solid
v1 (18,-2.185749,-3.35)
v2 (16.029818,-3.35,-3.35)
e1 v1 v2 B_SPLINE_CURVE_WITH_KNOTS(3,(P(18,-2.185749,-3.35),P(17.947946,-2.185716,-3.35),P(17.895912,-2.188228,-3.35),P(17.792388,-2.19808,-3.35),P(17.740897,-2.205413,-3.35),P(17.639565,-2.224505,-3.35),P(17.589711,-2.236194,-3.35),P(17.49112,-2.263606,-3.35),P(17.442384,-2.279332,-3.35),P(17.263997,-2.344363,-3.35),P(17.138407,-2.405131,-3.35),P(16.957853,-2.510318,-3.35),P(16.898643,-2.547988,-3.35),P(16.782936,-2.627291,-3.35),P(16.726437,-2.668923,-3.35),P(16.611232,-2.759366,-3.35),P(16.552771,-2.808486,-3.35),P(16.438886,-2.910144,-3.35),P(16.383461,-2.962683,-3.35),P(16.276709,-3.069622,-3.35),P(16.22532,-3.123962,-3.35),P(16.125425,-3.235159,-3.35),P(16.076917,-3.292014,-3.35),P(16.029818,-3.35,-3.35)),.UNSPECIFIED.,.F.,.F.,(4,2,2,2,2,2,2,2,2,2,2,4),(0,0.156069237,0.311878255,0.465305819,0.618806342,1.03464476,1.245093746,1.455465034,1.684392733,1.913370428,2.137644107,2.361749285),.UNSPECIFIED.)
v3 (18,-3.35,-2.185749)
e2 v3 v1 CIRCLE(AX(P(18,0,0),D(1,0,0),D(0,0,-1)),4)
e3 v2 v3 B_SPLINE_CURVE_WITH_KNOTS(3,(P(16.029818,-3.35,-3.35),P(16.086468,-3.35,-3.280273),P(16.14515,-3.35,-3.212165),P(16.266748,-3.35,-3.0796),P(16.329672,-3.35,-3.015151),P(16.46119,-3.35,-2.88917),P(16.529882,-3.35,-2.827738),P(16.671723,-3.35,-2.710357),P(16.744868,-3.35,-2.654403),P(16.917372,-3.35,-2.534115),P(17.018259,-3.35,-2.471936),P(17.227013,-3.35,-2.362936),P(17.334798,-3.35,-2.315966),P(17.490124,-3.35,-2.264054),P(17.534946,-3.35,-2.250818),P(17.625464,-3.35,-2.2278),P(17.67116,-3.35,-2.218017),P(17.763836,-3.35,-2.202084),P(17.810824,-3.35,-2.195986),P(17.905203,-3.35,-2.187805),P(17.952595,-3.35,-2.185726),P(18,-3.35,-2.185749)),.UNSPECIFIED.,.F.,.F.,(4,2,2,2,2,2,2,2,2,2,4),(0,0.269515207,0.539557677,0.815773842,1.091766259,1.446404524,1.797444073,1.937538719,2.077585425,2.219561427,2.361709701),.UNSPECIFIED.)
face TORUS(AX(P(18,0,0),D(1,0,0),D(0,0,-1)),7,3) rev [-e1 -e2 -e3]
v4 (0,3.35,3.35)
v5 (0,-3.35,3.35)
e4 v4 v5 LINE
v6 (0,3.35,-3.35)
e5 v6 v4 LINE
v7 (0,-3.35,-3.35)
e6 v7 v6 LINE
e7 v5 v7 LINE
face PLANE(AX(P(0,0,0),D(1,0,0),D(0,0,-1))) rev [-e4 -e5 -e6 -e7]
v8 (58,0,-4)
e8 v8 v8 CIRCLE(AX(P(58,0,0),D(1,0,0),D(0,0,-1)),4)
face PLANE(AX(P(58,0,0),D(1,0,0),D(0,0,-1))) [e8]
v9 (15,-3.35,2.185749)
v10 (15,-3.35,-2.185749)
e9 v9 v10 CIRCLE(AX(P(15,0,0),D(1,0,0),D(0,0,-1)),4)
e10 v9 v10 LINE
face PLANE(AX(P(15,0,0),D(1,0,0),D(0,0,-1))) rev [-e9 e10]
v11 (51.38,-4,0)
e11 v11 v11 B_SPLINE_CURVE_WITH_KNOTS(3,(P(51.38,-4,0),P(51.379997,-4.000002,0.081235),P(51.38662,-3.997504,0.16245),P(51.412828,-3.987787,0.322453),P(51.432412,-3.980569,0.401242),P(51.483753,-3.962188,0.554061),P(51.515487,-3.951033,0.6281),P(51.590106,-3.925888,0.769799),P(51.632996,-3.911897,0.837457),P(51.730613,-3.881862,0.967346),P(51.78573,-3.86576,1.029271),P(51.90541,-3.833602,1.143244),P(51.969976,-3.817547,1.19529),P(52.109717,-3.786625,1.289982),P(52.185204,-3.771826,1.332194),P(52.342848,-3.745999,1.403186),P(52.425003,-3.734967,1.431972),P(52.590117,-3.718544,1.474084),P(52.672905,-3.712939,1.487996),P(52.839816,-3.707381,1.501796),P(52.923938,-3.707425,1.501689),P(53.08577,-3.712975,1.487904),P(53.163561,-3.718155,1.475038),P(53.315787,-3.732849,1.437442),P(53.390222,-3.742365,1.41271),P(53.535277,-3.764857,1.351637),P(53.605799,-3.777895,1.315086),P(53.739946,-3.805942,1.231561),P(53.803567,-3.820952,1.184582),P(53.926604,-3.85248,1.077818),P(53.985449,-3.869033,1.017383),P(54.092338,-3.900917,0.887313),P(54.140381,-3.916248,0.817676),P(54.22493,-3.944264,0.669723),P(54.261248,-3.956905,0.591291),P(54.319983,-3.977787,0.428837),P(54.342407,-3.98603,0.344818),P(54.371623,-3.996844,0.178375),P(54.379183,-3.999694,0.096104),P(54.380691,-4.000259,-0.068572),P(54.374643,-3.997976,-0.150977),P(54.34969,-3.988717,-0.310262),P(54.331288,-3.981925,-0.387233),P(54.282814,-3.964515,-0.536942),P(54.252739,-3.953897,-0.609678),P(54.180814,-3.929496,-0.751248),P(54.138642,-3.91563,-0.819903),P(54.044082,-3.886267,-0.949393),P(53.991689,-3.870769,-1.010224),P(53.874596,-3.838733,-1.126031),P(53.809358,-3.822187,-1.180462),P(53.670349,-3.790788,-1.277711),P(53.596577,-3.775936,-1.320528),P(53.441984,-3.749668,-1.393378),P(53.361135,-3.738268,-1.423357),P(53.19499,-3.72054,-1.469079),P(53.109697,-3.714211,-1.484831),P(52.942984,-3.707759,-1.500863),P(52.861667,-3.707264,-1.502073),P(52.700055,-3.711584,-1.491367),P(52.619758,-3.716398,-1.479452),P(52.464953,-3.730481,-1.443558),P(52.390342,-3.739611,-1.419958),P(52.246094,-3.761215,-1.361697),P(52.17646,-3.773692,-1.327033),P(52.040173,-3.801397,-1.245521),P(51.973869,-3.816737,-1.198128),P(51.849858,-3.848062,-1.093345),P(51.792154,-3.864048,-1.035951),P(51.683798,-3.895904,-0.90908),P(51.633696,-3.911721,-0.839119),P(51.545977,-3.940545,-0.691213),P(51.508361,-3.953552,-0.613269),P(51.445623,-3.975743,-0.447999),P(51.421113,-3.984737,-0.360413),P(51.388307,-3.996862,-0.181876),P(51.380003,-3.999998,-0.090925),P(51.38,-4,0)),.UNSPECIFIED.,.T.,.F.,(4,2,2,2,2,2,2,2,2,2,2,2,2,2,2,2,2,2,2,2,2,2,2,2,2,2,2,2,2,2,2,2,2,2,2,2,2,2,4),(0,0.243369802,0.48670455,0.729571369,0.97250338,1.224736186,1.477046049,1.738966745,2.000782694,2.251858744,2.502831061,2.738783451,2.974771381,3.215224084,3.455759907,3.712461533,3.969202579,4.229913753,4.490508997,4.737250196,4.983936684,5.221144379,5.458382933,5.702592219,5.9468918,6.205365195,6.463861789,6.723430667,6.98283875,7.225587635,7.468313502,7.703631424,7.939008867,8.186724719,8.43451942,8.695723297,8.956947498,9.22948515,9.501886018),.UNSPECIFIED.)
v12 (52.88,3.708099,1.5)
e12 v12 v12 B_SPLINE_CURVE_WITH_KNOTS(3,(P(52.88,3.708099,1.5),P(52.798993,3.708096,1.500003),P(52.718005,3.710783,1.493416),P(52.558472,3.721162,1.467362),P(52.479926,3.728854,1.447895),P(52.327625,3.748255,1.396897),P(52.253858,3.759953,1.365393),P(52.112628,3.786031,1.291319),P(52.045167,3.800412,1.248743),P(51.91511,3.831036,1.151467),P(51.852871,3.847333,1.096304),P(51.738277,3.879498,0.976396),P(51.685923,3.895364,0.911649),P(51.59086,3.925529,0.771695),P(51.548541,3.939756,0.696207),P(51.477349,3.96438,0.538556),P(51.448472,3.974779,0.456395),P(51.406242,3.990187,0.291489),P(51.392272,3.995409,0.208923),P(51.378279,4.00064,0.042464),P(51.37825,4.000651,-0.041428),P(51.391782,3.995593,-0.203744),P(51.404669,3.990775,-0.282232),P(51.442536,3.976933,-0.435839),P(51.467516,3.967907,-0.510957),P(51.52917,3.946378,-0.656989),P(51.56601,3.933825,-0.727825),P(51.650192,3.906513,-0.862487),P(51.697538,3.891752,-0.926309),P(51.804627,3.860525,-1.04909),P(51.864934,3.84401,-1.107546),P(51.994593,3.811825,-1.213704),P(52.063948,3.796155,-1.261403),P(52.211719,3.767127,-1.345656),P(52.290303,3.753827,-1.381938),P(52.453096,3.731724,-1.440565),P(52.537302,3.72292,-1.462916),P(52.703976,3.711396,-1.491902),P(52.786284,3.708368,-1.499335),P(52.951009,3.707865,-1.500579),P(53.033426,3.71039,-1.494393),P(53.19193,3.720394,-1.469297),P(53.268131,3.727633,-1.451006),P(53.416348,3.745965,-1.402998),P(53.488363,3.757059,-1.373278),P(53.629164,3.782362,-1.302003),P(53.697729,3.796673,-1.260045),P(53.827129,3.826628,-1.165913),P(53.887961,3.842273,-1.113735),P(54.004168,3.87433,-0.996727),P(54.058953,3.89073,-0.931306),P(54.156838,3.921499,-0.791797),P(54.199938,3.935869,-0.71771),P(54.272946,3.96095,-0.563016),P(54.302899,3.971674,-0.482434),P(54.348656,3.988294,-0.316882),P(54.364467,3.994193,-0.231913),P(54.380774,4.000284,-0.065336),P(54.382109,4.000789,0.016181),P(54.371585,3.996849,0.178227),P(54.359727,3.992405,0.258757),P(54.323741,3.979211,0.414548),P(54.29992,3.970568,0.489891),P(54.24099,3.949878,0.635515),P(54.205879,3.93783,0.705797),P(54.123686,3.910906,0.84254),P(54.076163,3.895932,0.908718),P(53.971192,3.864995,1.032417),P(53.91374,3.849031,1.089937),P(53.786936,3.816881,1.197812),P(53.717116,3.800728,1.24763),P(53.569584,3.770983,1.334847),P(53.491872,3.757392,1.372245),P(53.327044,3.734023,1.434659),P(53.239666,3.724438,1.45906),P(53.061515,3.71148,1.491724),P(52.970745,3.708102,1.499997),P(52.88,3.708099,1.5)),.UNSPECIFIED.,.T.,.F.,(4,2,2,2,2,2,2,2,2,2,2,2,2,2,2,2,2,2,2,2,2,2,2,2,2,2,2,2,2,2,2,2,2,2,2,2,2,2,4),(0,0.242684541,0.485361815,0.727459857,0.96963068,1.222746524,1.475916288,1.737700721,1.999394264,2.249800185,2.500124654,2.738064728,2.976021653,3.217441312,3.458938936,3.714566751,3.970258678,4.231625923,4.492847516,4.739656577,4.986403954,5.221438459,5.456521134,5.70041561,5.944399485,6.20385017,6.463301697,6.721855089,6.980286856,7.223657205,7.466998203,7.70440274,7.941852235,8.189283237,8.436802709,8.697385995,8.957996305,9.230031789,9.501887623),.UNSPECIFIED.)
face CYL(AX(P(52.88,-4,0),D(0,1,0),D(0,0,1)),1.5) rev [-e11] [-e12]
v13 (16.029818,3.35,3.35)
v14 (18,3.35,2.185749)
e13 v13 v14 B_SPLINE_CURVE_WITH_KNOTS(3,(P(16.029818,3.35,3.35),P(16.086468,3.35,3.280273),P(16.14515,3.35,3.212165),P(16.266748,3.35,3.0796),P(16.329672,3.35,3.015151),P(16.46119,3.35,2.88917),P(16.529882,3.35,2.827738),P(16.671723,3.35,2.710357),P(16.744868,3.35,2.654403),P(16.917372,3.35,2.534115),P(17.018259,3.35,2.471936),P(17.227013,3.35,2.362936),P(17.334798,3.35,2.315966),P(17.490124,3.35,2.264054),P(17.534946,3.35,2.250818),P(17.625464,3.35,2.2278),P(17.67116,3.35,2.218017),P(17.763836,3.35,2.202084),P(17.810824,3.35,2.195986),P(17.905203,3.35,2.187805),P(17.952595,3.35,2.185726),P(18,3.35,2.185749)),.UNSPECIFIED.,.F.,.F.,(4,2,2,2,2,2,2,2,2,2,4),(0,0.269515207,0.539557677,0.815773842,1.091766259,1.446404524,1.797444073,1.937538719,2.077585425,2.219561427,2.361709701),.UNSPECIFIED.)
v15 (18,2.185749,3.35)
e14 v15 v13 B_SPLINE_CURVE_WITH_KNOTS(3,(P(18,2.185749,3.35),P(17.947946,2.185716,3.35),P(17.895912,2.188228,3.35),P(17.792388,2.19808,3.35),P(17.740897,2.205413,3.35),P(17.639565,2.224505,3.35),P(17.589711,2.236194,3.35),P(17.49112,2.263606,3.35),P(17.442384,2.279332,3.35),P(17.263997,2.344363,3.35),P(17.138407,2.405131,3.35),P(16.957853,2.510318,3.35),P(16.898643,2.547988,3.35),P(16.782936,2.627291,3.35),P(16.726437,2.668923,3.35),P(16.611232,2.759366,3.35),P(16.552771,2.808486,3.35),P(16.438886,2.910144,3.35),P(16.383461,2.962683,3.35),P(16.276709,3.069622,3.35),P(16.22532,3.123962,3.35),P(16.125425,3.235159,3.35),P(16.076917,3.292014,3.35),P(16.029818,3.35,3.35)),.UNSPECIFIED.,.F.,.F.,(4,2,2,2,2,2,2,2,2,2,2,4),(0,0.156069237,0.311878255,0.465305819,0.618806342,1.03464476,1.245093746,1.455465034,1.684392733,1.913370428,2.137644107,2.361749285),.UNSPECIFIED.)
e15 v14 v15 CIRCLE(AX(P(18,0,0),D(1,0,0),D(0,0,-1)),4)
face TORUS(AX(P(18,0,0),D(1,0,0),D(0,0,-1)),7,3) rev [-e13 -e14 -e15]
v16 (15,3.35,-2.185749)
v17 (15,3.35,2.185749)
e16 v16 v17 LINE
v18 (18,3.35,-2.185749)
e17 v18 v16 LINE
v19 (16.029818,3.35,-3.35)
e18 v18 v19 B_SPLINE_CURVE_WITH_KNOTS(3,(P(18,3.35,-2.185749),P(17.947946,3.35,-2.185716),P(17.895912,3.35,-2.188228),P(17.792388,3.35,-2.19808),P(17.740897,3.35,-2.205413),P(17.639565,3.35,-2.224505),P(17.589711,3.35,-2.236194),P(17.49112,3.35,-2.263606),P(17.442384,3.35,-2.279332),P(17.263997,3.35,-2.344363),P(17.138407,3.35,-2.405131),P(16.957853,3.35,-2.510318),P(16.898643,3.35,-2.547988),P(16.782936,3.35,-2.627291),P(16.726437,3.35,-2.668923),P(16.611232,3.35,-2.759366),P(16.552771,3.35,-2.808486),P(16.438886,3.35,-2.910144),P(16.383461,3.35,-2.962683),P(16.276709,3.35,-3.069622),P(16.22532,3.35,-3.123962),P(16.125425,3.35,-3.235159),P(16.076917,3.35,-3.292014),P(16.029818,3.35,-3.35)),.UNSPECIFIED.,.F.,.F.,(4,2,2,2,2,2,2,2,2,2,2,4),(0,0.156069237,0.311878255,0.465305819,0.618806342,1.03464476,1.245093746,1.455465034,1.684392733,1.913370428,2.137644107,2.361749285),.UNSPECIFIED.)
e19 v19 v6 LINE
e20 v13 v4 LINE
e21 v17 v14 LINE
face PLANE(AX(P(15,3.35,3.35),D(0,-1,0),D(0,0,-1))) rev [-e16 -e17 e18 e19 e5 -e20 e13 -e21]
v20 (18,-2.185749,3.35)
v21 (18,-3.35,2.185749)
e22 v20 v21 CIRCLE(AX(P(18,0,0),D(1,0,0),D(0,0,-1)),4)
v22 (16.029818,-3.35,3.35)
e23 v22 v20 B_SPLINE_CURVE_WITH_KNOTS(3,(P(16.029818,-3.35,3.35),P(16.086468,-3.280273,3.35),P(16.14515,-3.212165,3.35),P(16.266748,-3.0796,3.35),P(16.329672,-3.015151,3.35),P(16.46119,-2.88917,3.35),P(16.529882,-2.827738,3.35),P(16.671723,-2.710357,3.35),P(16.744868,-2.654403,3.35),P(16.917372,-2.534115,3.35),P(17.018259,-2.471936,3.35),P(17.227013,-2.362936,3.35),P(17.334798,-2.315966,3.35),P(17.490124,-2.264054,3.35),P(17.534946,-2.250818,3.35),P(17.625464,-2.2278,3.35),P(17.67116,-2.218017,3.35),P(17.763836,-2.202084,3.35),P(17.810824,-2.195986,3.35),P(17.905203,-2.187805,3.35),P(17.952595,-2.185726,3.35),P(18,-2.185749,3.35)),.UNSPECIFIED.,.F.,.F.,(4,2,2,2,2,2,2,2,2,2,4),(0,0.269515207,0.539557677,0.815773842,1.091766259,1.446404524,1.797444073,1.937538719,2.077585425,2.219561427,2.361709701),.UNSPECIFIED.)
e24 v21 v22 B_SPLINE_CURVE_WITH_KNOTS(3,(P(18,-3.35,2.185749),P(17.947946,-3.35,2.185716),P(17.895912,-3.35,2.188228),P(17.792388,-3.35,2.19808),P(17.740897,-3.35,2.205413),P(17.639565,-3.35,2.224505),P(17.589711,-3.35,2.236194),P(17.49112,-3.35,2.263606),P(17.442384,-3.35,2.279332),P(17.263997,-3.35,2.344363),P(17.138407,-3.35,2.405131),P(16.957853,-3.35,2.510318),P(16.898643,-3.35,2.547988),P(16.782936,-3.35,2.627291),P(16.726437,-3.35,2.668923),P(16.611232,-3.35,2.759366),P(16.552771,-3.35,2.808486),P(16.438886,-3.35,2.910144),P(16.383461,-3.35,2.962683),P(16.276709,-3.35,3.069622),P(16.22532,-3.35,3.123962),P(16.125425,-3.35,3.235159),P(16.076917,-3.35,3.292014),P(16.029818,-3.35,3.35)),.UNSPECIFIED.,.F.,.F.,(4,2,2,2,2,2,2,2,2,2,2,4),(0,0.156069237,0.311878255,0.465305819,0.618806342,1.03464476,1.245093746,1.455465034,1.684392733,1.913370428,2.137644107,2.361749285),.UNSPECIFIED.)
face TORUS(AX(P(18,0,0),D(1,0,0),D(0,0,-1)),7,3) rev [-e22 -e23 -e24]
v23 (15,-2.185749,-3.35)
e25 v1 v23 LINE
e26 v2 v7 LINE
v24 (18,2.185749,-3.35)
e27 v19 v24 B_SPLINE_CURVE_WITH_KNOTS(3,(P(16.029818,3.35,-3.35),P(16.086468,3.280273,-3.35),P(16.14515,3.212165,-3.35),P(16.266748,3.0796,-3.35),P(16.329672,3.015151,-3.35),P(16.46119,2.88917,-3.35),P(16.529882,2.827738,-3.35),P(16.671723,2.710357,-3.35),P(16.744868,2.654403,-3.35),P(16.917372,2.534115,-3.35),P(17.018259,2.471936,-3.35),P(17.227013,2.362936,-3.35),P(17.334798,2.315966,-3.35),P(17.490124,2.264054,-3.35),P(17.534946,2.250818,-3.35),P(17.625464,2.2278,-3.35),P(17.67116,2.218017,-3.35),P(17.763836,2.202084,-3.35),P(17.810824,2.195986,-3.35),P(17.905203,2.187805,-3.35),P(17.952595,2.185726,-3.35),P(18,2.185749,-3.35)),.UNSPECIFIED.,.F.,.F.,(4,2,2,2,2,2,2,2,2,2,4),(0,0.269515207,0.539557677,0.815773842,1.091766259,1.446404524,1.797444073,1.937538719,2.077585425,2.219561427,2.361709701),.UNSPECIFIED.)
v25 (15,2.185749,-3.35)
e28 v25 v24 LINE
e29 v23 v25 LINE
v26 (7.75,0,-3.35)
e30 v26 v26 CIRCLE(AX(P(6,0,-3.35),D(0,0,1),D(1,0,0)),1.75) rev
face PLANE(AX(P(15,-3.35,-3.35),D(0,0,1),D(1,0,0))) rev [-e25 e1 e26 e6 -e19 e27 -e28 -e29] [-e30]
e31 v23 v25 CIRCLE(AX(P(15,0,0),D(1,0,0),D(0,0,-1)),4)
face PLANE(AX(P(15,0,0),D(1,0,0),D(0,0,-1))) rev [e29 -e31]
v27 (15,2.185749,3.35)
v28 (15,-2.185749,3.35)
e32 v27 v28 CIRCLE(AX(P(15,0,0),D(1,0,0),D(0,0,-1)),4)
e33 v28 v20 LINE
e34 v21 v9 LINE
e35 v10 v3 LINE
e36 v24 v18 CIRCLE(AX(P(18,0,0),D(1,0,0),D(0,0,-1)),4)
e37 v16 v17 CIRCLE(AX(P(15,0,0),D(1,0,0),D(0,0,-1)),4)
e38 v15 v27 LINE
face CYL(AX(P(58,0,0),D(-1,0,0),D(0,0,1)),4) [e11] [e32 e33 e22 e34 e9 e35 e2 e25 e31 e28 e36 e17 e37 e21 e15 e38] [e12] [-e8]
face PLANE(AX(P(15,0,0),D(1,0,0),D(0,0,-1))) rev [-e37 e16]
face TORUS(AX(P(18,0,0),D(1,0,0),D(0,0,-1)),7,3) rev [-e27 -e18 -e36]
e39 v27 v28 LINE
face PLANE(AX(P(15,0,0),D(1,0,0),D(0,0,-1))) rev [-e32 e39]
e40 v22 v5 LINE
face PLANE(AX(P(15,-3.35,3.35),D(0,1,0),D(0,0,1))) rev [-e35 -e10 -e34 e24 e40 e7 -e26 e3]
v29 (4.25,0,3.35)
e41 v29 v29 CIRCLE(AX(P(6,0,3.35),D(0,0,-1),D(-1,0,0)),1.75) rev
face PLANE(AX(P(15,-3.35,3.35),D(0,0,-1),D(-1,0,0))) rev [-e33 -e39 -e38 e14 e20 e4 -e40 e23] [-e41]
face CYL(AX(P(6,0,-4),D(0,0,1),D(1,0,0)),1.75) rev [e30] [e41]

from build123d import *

# Parameters (mm, degrees)
ESQUISSE1_W                  = 6.7
ESQUISSE1_H                  = 6.7
BOSS_EXTRU_1_DEPTH           = 15
ESQUISSE2_R                  = 4
BOSS_EXTRU_2_DEPTH           = 43
ENL_V_MAT_EXTRU_1_DEPTH      = 59.275209137
ENL_V_MAT_EXTRU_1_DEPTH_BACK = 59.275209137
ESQUISSE3_R                  = 1.5
CONG_1_R                     = 3
ENL_V_MAT_EXTRU_2_DEPTH      = 59.600533392
ENL_V_MAT_EXTRU_2_DEPTH_BACK = 59.600533392
ESQUISSE4_R                  = 1.75


with BuildPart() as part:
    # Esquisse1 → Boss.-Extru.1 (new body)
    with BuildSketch(Plane.YZ):
        Rectangle(ESQUISSE1_W, ESQUISSE1_H)
    extrude(amount=BOSS_EXTRU_1_DEPTH)

    # Esquisse2 → Boss.-Extru.2 (add)
    with BuildSketch(Plane.YZ.offset(15)):
        with Locations(Location((0, 0, 0), (0, 0, 56.877059792))):
            Circle(ESQUISSE2_R)
    extrude(amount=BOSS_EXTRU_2_DEPTH)

    # Esquisse3 → Enlèv. mat.-Extru.1 (cut, two sides: drawn at the far end of the back side and taken through both)
    with BuildSketch(Plane(origin=(0, 0, 0), x_dir=(-1, 0, 0), z_dir=(0, 1, 0)).offset(-ENL_V_MAT_EXTRU_1_DEPTH_BACK)):
        with Locations(Location((-52.88, 0, 0), (0, 0, 90))):
            Circle(ESQUISSE3_R)
    extrude(amount=ENL_V_MAT_EXTRU_1_DEPTH + ENL_V_MAT_EXTRU_1_DEPTH_BACK, mode=Mode.SUBTRACT)

    # Congé1
    # the kernel refuses this fillet: 3 mm, written as the material it adds along each edge
    with BuildSketch(Plane(origin=(15, 0, 0), x_dir=(0, -0.9627373172303846, -0.27043827024302985), z_dir=(0, -0.27043827024302985, 0.9627373172303846))) as cong_1_piece_1_section:
        with BuildLine():
            CenterArc((4 + CONG_1_R, CONG_1_R), CONG_1_R, 180, 90)
            Line((4 + CONG_1_R, 0), (4, 0))
            Line((4, 0), (4, CONG_1_R))
        make_face()
    cong_1_piece_1 = revolve(axis=Axis((15, 0, 0), (1, 0, 0)), revolution_arc=238.619303718, mode=Mode.PRIVATE)
    cong_1_piece_1 = split(cong_1_piece_1, bisect_by=Plane(origin=(16.010494669, -2.96099487, 3.35), z_dir=(0, 0, -1)), keep=Keep.TOP, mode=Mode.PRIVATE)
    cong_1_piece_1 = split(cong_1_piece_1, bisect_by=Plane(origin=(16.010494669, -2.96099487, -3.35), z_dir=(0, 0, 1)), keep=Keep.TOP, mode=Mode.PRIVATE)
    cong_1_piece_1 = split(cong_1_piece_1, bisect_by=Plane(origin=(16.010494669, 3.35, -2.96099477), z_dir=(0, -1, 0)), keep=Keep.TOP, mode=Mode.PRIVATE)
    cong_1_piece_1 = split(cong_1_piece_1, bisect_by=Plane(origin=(16.010494669, -3.35, -2.96099477), z_dir=(0, 1, 0)), keep=Keep.TOP, mode=Mode.PRIVATE)
    add(cong_1_piece_1)
    with BuildSketch(Plane(origin=(15, 0, 0), x_dir=(0, 0.27043827024295675, -0.962737317230405), z_dir=(0, -0.962737317230405, -0.27043827024295675))) as cong_1_piece_2_section:
        with BuildLine():
            CenterArc((4 + CONG_1_R, CONG_1_R), CONG_1_R, 180, 90)
            Line((4 + CONG_1_R, 0), (4, 0))
            Line((4, 0), (4, CONG_1_R))
        make_face()
    cong_1_piece_2 = revolve(axis=Axis((15, 0, 0), (1, 0, 0)), revolution_arc=238.619303718, mode=Mode.PRIVATE)
    cong_1_piece_2 = split(cong_1_piece_2, bisect_by=Plane(origin=(16.010494669, 2.96099477, 3.35), z_dir=(0, 0, -1)), keep=Keep.TOP, mode=Mode.PRIVATE)
    cong_1_piece_2 = split(cong_1_piece_2, bisect_by=Plane(origin=(16.010494669, 2.96099477, -3.35), z_dir=(0, 0, 1)), keep=Keep.TOP, mode=Mode.PRIVATE)
    cong_1_piece_2 = split(cong_1_piece_2, bisect_by=Plane(origin=(16.010494669, 3.35, -2.96099487), z_dir=(0, -1, 0)), keep=Keep.TOP, mode=Mode.PRIVATE)
    cong_1_piece_2 = split(cong_1_piece_2, bisect_by=Plane(origin=(16.010494669, -3.35, -2.96099487), z_dir=(0, 1, 0)), keep=Keep.TOP, mode=Mode.PRIVATE)
    add(cong_1_piece_2)
    with BuildSketch(Plane(origin=(15, 0, 0), x_dir=(0, 0.9627373172304061, 0.27043827024295286), z_dir=(0, 0.27043827024295286, -0.9627373172304061))) as cong_1_piece_3_section:
        with BuildLine():
            CenterArc((4 + CONG_1_R, CONG_1_R), CONG_1_R, 180, 90)
            Line((4 + CONG_1_R, 0), (4, 0))
            Line((4, 0), (4, CONG_1_R))
        make_face()
    cong_1_piece_3 = revolve(axis=Axis((15, 0, 0), (1, 0, 0)), revolution_arc=238.619303718, mode=Mode.PRIVATE)
    cong_1_piece_3 = split(cong_1_piece_3, bisect_by=Plane(origin=(16.010494669, 2.96099487, 3.35), z_dir=(0, 0, -1)), keep=Keep.TOP, mode=Mode.PRIVATE)
    cong_1_piece_3 = split(cong_1_piece_3, bisect_by=Plane(origin=(16.010494669, 2.96099487, -3.35), z_dir=(0, 0, 1)), keep=Keep.TOP, mode=Mode.PRIVATE)
    cong_1_piece_3 = split(cong_1_piece_3, bisect_by=Plane(origin=(16.010494669, 3.35, 2.96099477), z_dir=(0, -1, 0)), keep=Keep.TOP, mode=Mode.PRIVATE)
    cong_1_piece_3 = split(cong_1_piece_3, bisect_by=Plane(origin=(16.010494669, -3.35, 2.96099477), z_dir=(0, 1, 0)), keep=Keep.TOP, mode=Mode.PRIVATE)
    add(cong_1_piece_3)
    with BuildSketch(Plane(origin=(15, 0, 0), x_dir=(0, -0.2704382702430083, 0.9627373172303906), z_dir=(0, 0.9627373172303906, 0.2704382702430083))) as cong_1_piece_4_section:
        with BuildLine():
            CenterArc((4 + CONG_1_R, CONG_1_R), CONG_1_R, 180, 90)
            Line((4 + CONG_1_R, 0), (4, 0))
            Line((4, 0), (4, CONG_1_R))
        make_face()
    cong_1_piece_4 = revolve(axis=Axis((15, 0, 0), (1, 0, 0)), revolution_arc=238.619303718, mode=Mode.PRIVATE)
    cong_1_piece_4 = split(cong_1_piece_4, bisect_by=Plane(origin=(16.010494669, -2.96099477, 3.35), z_dir=(0, 0, -1)), keep=Keep.TOP, mode=Mode.PRIVATE)
    cong_1_piece_4 = split(cong_1_piece_4, bisect_by=Plane(origin=(16.010494669, -2.96099477, -3.35), z_dir=(0, 0, 1)), keep=Keep.TOP, mode=Mode.PRIVATE)
    cong_1_piece_4 = split(cong_1_piece_4, bisect_by=Plane(origin=(16.010494669, 3.35, 2.96099487), z_dir=(0, -1, 0)), keep=Keep.TOP, mode=Mode.PRIVATE)
    cong_1_piece_4 = split(cong_1_piece_4, bisect_by=Plane(origin=(16.010494669, -3.35, 2.96099487), z_dir=(0, 1, 0)), keep=Keep.TOP, mode=Mode.PRIVATE)
    add(cong_1_piece_4)

    # Esquisse4 → Enlèv. mat.-Extru.2 (cut, two sides: drawn at the far end of the back side and taken through both)
    with BuildSketch(Plane(origin=(0, 0, 3.35), x_dir=(-1, 0, 0), z_dir=(0, 0, -1)).offset(-ENL_V_MAT_EXTRU_2_DEPTH_BACK)):
        with Locations(Location((-6, 0, 0), (0, 0, 180))):
            Circle(ESQUISSE4_R)
    extrude(amount=ENL_V_MAT_EXTRU_2_DEPTH + ENL_V_MAT_EXTRU_2_DEPTH_BACK, mode=Mode.SUBTRACT)


solid = part.part
